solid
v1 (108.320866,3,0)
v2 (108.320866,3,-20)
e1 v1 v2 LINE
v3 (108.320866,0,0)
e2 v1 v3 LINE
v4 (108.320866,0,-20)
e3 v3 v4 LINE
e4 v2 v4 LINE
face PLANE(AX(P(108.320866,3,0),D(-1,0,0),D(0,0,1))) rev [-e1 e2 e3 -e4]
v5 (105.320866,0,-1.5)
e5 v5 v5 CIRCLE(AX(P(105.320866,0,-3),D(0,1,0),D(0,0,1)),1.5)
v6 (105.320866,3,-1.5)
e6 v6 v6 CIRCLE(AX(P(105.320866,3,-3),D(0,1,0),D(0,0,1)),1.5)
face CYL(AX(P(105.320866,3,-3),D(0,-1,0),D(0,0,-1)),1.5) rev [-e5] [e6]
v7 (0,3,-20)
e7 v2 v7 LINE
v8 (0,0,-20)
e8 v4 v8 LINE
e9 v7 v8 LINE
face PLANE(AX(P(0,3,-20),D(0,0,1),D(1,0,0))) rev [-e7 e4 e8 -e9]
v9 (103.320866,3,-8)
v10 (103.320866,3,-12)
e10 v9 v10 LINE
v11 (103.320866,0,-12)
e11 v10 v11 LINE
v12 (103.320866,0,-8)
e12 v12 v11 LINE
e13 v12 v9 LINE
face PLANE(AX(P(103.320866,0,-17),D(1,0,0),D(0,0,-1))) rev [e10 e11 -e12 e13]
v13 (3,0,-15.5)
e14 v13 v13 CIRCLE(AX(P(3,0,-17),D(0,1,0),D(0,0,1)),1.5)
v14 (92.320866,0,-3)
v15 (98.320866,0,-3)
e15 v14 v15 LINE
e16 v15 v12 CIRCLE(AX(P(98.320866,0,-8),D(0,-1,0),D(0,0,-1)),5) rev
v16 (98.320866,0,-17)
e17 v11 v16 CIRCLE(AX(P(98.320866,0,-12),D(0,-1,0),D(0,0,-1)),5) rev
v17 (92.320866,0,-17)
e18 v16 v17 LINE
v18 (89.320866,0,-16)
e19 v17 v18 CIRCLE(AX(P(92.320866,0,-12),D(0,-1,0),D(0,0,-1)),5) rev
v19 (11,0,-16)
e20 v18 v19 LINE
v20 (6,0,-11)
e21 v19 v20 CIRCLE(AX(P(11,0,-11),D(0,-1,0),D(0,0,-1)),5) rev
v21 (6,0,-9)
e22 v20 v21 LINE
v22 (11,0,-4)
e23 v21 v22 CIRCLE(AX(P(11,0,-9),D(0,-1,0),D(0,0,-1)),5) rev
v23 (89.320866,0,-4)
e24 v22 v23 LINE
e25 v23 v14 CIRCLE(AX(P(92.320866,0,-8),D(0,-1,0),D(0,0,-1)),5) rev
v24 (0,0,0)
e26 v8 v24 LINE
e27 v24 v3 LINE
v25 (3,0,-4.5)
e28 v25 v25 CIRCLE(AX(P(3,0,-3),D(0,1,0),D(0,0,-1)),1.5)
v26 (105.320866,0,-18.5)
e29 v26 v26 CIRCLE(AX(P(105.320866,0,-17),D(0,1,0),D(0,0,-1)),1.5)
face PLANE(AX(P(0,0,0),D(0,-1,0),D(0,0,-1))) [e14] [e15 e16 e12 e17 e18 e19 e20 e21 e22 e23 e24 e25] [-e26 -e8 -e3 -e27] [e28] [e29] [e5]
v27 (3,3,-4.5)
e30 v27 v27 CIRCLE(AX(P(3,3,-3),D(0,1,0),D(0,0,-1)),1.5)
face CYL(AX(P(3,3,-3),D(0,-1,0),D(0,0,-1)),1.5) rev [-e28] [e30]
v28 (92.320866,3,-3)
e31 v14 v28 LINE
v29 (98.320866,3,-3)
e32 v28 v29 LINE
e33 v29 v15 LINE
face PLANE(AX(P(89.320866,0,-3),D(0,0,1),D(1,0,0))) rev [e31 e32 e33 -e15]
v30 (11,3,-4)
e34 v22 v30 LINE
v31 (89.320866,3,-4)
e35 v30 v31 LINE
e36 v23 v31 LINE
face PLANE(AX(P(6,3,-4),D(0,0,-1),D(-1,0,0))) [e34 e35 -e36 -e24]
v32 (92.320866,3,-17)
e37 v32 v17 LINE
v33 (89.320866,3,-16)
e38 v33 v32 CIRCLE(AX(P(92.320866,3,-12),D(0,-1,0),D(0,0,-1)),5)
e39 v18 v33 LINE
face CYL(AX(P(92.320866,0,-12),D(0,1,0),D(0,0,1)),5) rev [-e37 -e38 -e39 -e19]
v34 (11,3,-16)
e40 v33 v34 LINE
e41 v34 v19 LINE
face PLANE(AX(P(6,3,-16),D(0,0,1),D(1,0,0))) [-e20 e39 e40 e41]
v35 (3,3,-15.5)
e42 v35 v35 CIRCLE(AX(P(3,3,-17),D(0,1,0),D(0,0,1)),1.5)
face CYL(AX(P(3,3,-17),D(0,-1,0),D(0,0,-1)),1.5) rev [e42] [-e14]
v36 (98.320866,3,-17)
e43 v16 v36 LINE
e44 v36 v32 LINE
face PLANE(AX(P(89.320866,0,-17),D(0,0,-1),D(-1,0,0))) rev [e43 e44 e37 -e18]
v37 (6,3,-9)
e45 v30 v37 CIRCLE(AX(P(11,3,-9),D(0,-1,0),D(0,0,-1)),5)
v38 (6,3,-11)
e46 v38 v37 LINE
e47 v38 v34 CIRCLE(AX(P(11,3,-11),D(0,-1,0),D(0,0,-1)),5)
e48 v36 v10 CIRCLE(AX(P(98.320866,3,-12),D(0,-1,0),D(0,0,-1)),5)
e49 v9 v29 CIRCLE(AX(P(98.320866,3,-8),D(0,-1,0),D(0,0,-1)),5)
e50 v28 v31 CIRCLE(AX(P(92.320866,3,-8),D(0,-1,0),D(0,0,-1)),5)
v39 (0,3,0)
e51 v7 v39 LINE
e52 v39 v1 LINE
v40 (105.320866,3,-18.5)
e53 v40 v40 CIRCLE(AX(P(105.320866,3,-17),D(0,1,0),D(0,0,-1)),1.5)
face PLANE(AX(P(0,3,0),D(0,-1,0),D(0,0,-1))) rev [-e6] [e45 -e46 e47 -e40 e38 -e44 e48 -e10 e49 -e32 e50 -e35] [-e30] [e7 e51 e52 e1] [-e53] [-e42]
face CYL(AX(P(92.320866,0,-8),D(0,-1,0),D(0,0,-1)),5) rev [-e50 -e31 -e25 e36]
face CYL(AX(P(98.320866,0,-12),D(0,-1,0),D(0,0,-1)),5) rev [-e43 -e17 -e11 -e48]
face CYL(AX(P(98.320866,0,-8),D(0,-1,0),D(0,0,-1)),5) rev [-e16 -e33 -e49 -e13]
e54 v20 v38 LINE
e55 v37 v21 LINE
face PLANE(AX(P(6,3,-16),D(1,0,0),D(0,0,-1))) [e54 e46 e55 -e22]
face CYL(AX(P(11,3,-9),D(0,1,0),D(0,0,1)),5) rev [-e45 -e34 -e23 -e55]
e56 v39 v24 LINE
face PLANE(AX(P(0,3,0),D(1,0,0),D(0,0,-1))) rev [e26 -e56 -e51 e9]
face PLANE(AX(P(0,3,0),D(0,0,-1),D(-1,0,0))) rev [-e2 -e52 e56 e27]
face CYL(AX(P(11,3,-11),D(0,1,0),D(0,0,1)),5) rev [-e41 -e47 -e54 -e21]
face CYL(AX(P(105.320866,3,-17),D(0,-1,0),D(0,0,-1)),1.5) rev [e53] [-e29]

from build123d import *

# Parameters (mm, degrees)
SKETCH1_W           = 108.320866354
SKETCH1_H           = 20
SKETCH1_R           = 1.5
SKETCH1_W_2         = 96.320866354
SKETCH1_H_2         = 12
BOSS_EXTRUDE1_DEPTH = 3
CUT_EXTRUDE1_DEPTH  = 111.192604505
FILLET1_R           = 5


with BuildPart() as part:
    # Sketch1 → Boss-Extrude1 (new body)
    with BuildSketch(Plane(origin=(0, 0, 0), x_dir=(1, 0, 0), z_dir=(0, 1, 0))):
        with Locations((54.160433177, 10)):
            Rectangle(SKETCH1_W, SKETCH1_H)
        with Locations(Location((3, 17, 0), (0, 0, 270))):
            Circle(SKETCH1_R, mode=Mode.SUBTRACT)
        with Locations(Location((3, 3, 0), (0, 0, 90))):
            Circle(SKETCH1_R, mode=Mode.SUBTRACT)
        with Locations(Location((105.320866354, 3, 0), (0, 0, 270))):
            Circle(SKETCH1_R, mode=Mode.SUBTRACT)
        with Locations(Location((105.320866354, 17, 0), (0, 0, 90))):
            Circle(SKETCH1_R, mode=Mode.SUBTRACT)
        with Locations((54.160433177, 10)):
            Rectangle(SKETCH1_W_2, SKETCH1_H_2, mode=Mode.SUBTRACT)
    extrude(amount=BOSS_EXTRUDE1_DEPTH)

    # Sketch2 → Cut-Extrude1 (cut, through all)
    with BuildSketch(Plane(origin=(0, 3, 0), x_dir=(1, 0, 0), z_dir=(0, 1, 0))):
        Polygon((89.320866354, 17), (89.320866354, 16), (102.320866354, 16), (102.320866354, 4), (89.320866354, 4), (89.320866354, 3), (103.320866354, 3), (103.320866354, 17), align=None)
    extrude(amount=-CUT_EXTRUDE1_DEPTH, mode=Mode.SUBTRACT)

    # Fillet1
    # the kernel refuses this fillet: 5 mm, written as the material it adds along each edge
    with BuildSketch(Plane(origin=(103.320866354, 3, -17), x_dir=(0, 0, 1), z_dir=(0, -1, 0)), Plane(origin=(103.320866354, 3, -3), x_dir=(-1, 0, 0), z_dir=(0, -1, 0)), Plane(origin=(6, 0, -16), x_dir=(0, 0, 1), z_dir=(0, 1, 0))) as fillet1_piece_1:
        with BuildLine():
            CenterArc((FILLET1_R, FILLET1_R), FILLET1_R, 180, 90)
            Line((0, FILLET1_R), (-FILLET1_R * 0.02, FILLET1_R))
            Line((-FILLET1_R * 0.02, FILLET1_R), (-FILLET1_R * 0.02, -FILLET1_R * 0.02))
            Line((-FILLET1_R * 0.02, -FILLET1_R * 0.02), (FILLET1_R, -FILLET1_R * 0.02))
            Line((FILLET1_R, -FILLET1_R * 0.02), (FILLET1_R, 0))
        make_face()
    extrude(amount=3)
    with BuildSketch(Plane(origin=(89.320866354, 3, -17), x_dir=(1, 0, 0), z_dir=(0, -1, 0))) as fillet1_piece_2:
        with BuildLine():
            CenterArc((3, 5), FILLET1_R, 233.130102354, 36.869897646)
            Line((0, 1), (-0.06, 0.92))
            ThreePointArc((-0.06, 0.92), (-0.1, 0.5), (-0.1, 0))
            Line((-0.1, 0), (0, -0.1))
            Line((0, -0.1), (3, -0.1))
            Line((3, -0.1), (3, 0))
        make_face()
    extrude(amount=3)
    with BuildSketch(Plane(origin=(89.320866354, 3, -3), x_dir=(0, 0, -1), z_dir=(0, -1, 0))) as fillet1_piece_3:
        with BuildLine():
            CenterArc((5, 3), FILLET1_R, 180, 36.869897646)
            Line((0, 3), (-0.1, 3))
            Line((-0.1, 3), (-0.1, 0))
            Line((-0.1, 0), (0, -0.1))
            ThreePointArc((0, -0.1), (0.5, -0.1), (0.92, -0.06))
            Line((0.92, -0.06), (1, 0))
        make_face()
    extrude(amount=3)
    with BuildSketch(Plane(origin=(6, 0, -4), x_dir=(0, 0, -1), z_dir=(0, 1, 0))) as fillet1_piece_4:
        with BuildLine():
            CenterArc((FILLET1_R, -FILLET1_R), FILLET1_R, 90, 90)
            Line((0, -FILLET1_R), (-FILLET1_R * 0.02, -FILLET1_R))
            Line((-FILLET1_R * 0.02, -FILLET1_R), (-FILLET1_R * 0.02, FILLET1_R * 0.02))
            Line((-FILLET1_R * 0.02, FILLET1_R * 0.02), (FILLET1_R, FILLET1_R * 0.02))
            Line((FILLET1_R, FILLET1_R * 0.02), (FILLET1_R, 0))
        make_face()
    extrude(amount=3)


solid = part.part
